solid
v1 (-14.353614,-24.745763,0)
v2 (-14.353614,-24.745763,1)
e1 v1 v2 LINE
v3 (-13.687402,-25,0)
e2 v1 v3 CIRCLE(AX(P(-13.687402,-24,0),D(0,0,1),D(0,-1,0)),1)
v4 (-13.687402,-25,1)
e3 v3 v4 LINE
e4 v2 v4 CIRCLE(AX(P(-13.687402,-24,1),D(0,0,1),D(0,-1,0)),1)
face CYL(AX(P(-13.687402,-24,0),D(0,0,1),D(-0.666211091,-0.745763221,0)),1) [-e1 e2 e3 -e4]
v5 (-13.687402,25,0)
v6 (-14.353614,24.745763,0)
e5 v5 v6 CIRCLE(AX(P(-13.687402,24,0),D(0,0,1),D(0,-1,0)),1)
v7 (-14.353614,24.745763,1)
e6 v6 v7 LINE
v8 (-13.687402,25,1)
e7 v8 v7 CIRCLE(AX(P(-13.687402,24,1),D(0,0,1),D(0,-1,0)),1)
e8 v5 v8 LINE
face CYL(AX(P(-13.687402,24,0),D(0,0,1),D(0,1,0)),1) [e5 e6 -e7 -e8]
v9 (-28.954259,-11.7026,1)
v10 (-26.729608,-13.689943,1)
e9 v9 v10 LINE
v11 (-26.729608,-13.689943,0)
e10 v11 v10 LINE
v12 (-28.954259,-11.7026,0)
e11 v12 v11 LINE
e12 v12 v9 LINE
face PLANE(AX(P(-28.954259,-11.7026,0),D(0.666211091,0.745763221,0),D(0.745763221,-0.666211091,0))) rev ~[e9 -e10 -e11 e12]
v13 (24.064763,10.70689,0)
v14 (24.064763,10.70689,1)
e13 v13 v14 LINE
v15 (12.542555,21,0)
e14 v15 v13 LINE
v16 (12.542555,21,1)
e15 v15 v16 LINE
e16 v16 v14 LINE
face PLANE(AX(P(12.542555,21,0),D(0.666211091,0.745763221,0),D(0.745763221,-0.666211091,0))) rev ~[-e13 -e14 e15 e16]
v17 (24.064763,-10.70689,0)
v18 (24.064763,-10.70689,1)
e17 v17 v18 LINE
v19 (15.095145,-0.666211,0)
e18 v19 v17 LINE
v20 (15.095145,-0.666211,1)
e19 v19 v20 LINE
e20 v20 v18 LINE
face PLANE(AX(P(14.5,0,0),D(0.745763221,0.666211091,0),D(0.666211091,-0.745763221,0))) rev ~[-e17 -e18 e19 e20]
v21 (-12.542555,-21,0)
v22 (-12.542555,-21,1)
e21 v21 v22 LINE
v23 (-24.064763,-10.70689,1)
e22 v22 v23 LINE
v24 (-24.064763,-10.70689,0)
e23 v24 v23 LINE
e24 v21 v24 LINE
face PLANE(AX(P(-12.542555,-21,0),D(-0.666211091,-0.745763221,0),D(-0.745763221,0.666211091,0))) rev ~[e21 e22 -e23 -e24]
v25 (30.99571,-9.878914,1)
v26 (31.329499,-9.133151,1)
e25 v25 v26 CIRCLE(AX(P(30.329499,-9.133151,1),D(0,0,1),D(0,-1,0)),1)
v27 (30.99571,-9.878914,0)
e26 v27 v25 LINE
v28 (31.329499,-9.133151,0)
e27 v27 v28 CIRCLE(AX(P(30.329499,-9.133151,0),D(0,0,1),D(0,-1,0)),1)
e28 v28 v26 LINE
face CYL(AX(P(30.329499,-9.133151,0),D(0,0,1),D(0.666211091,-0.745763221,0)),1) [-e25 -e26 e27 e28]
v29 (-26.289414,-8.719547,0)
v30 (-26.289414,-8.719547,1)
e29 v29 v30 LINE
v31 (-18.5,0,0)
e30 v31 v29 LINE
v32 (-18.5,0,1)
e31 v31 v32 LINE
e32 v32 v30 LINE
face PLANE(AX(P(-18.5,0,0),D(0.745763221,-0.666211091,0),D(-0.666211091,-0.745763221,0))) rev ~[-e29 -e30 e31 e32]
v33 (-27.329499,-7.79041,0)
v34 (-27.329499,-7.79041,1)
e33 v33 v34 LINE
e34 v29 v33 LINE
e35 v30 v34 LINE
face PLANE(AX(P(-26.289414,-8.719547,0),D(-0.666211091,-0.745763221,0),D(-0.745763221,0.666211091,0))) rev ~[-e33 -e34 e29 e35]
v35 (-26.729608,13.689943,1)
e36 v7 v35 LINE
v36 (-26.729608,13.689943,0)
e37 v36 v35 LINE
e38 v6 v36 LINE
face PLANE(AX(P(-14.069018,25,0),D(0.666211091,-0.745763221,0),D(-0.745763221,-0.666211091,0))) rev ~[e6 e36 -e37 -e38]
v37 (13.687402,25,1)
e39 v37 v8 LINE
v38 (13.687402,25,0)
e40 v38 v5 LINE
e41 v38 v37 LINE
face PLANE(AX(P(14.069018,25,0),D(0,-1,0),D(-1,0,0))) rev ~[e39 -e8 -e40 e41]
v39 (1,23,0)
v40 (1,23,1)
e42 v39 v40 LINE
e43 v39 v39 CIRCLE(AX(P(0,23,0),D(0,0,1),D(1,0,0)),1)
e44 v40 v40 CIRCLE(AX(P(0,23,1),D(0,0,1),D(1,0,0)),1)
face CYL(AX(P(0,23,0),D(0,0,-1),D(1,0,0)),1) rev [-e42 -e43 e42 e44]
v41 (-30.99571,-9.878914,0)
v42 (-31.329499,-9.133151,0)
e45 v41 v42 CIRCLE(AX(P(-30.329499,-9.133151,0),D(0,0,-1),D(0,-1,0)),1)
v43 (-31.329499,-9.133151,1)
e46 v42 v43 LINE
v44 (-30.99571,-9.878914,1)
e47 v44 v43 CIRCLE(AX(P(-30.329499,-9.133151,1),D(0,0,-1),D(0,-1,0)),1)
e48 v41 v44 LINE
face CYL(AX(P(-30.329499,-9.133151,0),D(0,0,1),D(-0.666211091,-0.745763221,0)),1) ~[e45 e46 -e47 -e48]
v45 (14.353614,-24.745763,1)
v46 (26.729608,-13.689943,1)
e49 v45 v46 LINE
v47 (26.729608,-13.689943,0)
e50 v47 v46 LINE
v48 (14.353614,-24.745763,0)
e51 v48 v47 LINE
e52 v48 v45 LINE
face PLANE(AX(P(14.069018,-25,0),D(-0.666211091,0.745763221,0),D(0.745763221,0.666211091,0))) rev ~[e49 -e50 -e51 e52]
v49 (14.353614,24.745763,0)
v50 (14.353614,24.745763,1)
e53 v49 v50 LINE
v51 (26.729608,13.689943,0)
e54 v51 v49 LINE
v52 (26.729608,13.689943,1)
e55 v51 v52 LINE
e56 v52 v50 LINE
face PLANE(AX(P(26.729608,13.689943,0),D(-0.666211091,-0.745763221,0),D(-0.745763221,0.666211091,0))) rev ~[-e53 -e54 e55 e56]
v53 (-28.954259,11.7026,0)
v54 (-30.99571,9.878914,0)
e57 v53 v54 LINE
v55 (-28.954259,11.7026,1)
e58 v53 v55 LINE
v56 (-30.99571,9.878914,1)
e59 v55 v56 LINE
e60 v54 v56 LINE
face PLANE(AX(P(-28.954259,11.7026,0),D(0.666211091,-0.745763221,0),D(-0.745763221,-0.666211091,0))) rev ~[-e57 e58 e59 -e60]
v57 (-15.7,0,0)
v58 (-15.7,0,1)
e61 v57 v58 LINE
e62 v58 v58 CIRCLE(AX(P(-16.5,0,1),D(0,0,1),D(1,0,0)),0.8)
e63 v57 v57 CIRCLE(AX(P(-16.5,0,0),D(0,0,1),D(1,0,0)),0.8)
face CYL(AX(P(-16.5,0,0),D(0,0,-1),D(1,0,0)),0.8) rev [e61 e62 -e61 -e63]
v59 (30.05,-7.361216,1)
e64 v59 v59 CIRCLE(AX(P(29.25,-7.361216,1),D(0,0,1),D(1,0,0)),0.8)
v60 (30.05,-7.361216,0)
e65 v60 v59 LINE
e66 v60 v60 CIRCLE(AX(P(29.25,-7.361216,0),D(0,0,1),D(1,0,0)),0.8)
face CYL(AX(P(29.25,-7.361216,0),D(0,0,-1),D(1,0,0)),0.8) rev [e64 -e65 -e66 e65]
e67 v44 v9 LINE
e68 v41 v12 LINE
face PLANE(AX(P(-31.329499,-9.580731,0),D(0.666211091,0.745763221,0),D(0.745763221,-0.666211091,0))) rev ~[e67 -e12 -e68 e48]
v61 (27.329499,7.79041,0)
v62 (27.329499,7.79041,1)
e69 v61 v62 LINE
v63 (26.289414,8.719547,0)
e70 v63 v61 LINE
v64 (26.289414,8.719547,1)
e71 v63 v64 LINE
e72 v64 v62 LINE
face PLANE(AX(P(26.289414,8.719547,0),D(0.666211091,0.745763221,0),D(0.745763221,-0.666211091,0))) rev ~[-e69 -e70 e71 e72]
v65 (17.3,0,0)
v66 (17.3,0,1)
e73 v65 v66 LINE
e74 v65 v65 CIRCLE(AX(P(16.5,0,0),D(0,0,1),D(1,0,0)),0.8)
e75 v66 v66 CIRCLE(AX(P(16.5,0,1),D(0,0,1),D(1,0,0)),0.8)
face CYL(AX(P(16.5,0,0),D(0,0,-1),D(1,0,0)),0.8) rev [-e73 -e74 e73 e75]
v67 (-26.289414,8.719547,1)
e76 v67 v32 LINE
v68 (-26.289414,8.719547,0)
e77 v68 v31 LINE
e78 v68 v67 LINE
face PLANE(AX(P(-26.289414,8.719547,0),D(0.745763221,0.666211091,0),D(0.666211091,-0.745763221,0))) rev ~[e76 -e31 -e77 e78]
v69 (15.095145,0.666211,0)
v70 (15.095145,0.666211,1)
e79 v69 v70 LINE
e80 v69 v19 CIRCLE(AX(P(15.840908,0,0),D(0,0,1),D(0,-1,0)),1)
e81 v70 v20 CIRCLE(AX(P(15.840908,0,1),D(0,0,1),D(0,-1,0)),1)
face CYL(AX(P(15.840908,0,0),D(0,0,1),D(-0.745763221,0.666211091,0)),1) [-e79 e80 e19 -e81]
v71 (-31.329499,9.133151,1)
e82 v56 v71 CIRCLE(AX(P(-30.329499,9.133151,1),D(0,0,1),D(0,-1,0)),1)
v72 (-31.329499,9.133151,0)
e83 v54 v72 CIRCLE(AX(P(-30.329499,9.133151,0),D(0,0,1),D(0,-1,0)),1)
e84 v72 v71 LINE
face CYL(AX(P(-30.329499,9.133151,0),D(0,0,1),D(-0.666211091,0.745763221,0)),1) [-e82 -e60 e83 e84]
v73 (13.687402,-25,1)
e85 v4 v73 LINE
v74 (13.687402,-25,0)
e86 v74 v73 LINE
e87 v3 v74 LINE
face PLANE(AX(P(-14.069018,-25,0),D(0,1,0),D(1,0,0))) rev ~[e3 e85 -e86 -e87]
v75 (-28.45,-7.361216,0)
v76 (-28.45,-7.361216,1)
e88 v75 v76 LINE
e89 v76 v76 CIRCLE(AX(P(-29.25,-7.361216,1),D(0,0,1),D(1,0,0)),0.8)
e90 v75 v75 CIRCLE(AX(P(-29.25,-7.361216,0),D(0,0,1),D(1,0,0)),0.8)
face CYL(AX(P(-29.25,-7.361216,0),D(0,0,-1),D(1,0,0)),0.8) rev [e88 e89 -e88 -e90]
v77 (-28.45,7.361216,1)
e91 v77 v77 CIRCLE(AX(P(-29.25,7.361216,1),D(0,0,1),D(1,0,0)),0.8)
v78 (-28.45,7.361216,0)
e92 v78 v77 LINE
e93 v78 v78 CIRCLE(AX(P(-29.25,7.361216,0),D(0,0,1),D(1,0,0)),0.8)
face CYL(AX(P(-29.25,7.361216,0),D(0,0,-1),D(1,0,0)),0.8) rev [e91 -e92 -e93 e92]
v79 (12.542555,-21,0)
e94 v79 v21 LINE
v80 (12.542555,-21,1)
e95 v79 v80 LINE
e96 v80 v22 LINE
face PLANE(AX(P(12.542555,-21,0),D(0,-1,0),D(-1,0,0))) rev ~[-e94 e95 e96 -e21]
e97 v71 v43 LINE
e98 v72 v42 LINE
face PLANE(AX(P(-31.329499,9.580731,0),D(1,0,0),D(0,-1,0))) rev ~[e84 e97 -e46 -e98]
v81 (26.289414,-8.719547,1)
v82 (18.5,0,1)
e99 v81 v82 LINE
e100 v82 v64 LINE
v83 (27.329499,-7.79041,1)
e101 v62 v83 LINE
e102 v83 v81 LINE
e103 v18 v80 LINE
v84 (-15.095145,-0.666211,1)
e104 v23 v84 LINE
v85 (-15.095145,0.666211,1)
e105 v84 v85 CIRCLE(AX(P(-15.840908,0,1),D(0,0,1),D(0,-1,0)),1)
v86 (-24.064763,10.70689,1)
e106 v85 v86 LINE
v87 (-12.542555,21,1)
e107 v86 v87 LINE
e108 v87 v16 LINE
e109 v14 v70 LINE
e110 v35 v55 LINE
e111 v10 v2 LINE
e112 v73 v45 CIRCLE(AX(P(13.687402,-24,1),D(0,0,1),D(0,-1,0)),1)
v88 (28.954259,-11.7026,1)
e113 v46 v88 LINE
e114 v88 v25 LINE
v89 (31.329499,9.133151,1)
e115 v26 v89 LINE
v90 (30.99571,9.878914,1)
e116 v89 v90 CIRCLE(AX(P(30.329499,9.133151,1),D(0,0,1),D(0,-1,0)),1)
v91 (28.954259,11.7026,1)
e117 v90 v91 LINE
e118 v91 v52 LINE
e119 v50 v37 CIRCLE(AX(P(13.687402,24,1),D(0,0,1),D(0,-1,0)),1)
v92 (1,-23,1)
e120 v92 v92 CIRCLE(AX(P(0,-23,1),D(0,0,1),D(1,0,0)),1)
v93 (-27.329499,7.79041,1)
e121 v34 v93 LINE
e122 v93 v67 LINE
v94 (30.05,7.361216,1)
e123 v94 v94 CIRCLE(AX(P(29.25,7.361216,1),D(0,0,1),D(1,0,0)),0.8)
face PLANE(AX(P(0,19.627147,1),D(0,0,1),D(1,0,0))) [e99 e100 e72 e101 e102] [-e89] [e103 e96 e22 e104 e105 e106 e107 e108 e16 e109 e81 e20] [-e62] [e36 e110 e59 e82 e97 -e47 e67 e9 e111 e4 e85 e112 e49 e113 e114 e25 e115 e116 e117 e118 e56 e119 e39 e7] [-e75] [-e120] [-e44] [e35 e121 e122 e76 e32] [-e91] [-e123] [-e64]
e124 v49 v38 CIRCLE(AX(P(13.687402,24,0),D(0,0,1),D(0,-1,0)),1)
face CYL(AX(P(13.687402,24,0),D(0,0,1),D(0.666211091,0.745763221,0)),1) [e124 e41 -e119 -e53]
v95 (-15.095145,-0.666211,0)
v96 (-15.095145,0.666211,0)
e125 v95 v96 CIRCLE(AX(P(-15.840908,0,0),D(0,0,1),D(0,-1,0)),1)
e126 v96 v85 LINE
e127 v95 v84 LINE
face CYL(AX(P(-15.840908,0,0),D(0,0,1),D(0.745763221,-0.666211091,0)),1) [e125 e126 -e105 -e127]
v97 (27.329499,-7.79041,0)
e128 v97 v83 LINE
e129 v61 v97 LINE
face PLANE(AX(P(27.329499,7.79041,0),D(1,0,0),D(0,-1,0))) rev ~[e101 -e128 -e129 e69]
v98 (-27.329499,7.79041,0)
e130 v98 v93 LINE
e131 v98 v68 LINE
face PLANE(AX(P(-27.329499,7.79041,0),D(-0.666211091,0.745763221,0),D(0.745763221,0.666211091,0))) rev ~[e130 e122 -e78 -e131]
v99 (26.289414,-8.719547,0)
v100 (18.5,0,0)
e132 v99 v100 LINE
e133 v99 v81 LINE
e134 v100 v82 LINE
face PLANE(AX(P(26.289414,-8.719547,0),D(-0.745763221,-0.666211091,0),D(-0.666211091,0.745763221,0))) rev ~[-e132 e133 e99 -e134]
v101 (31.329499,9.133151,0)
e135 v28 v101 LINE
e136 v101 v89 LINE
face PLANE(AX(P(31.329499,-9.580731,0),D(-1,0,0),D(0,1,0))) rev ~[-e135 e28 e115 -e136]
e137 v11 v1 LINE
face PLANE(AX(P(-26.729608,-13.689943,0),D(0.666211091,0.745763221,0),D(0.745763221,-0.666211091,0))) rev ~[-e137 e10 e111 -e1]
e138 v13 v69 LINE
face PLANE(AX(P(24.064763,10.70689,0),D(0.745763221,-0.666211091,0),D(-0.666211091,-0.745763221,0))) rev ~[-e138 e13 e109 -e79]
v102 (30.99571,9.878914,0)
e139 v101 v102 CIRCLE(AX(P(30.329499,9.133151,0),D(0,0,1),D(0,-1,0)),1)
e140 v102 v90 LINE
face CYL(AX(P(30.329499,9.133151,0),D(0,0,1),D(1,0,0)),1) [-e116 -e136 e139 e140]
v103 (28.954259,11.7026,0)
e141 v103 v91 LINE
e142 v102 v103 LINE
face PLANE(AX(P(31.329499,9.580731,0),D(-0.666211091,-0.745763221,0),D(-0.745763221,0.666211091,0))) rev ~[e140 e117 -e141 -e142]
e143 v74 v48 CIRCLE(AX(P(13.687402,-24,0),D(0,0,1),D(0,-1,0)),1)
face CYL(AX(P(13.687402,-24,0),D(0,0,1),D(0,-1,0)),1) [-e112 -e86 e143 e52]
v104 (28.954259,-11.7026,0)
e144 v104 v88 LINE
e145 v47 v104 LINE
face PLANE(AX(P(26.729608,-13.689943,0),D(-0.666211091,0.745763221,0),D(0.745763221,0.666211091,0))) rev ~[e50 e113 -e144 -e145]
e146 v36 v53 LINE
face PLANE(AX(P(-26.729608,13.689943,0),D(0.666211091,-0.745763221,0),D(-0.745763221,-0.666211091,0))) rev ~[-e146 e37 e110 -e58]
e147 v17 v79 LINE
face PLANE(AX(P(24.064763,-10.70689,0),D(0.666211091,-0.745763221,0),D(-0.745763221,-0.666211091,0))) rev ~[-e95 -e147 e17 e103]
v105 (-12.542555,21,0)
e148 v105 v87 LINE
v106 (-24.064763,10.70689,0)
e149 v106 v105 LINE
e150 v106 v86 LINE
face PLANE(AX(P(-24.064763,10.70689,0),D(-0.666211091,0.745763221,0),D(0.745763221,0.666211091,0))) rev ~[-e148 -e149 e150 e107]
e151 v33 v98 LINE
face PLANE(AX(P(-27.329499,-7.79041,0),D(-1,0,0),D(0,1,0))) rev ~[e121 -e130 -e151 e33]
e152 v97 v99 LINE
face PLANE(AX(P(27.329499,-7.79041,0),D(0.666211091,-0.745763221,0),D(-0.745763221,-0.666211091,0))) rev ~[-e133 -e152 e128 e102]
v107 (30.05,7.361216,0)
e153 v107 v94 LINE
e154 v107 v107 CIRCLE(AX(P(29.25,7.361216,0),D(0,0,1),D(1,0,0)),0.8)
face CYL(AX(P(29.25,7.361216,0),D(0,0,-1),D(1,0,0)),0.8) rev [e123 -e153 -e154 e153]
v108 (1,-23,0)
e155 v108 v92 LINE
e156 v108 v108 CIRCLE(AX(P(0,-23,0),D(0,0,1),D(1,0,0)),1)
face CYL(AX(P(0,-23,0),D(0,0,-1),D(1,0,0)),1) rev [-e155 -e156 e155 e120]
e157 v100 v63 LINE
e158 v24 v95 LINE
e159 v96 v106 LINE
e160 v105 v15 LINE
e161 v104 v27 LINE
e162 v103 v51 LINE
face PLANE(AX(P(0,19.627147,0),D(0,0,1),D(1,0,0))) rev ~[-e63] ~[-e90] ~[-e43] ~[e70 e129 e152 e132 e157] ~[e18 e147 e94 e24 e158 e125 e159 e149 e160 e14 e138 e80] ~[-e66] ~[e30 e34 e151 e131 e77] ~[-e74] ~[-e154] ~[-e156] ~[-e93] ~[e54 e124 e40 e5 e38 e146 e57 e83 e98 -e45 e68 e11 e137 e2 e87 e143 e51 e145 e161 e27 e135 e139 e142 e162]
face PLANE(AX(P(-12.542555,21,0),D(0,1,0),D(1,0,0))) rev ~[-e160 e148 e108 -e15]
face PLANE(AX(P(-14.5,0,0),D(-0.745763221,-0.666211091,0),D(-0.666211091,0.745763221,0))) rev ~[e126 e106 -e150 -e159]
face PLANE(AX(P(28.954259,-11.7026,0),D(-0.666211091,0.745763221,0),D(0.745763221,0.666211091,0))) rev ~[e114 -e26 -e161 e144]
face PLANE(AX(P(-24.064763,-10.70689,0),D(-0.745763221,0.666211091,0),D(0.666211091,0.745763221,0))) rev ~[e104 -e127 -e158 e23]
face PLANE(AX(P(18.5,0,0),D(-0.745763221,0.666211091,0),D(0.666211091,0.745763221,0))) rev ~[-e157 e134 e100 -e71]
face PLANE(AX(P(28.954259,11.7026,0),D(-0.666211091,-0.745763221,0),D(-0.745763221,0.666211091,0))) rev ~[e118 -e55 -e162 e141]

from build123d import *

# Parameters (mm, degrees)
F0_R     = 1
F0_R_2   = 0.8
F1_DEPTH = 1
F2_R     = 1


with BuildPart() as f1:
    # F0 (on Top) → F1 (new body)
    with BuildSketch(Plane.XY):
        Polygon((14.0690184001, 25), (0, 25), (-14.0690184001, 25), (-26.7296075576, 13.6899425008), (-24.0647631939, 10.7068896154), (-12.5425545984, 21), (0, 21), (12.5425545984, 21), (24.0647631939, 10.7068896154), (26.7296075576, 13.6899425008), align=None)
        with Locations((0, 23)):
            Circle(F0_R, mode=Mode.SUBTRACT)
        Polygon((28.9542586869, 11.7025995837), (26.7296075576, 13.6899425008), (24.0647631939, 10.7068896154), (26.2894143232, 8.7195466983), align=None)
        Polygon((-24.0647631939, 10.7068896154), (-26.7296075576, 13.6899425008), (-28.9542586869, 11.7025995837), (-26.2894143232, 8.7195466983), align=None)
        Polygon((31.3294992745, 9.5807309025), (28.9542586869, 11.7025995837), (26.2894143232, 8.7195466983), (27.3294992745, 7.7904097951), (27.3294992745, 0.0814010352), (27.3294992745, -0.0814010352), (27.3294992745, -7.7904097951), (26.2894143232, -8.7195466983), (28.9542586869, -11.7025995837), (31.3294992745, -9.5807309025), (31.3294992745, 0), align=None)
        with Locations((29.25, -7.3612159322)):
            Circle(F0_R_2, mode=Mode.SUBTRACT)
        with Locations((29.25, 7.3612159322)):
            Circle(F0_R_2, mode=Mode.SUBTRACT)
        Polygon((26.2894143232, 8.7195466983), (24.0647631939, 10.7068896154), (14.5, 0), (24.0647631939, -10.7068896154), (26.2894143232, -8.7195466983), (18.5, 0), align=None)
        with Locations((16.5, 0)):
            Circle(F0_R_2, mode=Mode.SUBTRACT)
        Polygon((-26.2894143232, 8.7195466983), (-28.9542586869, 11.7025995837), (-31.3294992745, 9.5807309025), (-31.3294992745, 0), (-31.3294992745, -9.5807309025), (-28.9542586869, -11.7025995837), (-26.2894143232, -8.7195466983), (-27.3294992745, -7.7904097951), (-27.3294992745, -0.0814010352), (-27.3294992745, 0.0814010352), (-27.3294992745, 7.7904097951), align=None)
        with Locations((-29.25, -7.3612159322)):
            Circle(F0_R_2, mode=Mode.SUBTRACT)
        with Locations((-29.25, 7.3612159322)):
            Circle(F0_R_2, mode=Mode.SUBTRACT)
        Polygon((-14.5, 0), (-24.0647631939, 10.7068896154), (-26.2894143232, 8.7195466983), (-18.5, 0), (-26.2894143232, -8.7195466983), (-24.0647631939, -10.7068896154), align=None)
        with Locations((-16.5, 0)):
            Circle(F0_R_2, mode=Mode.SUBTRACT)
        Polygon((26.2894143232, -8.7195466983), (24.0647631939, -10.7068896154), (26.7296075576, -13.6899425008), (28.9542586869, -11.7025995837), align=None)
        Polygon((26.7296075576, -13.6899425008), (24.0647631939, -10.7068896154), (12.5425545984, -21), (0, -21), (-12.5425545984, -21), (-24.0647631939, -10.7068896154), (-26.7296075576, -13.6899425008), (-14.0690184001, -25), (0, -25), (14.0690184001, -25), align=None)
        with Locations((0, -23)):
            Circle(F0_R, mode=Mode.SUBTRACT)
        Polygon((-26.7296075576, -13.6899425008), (-24.0647631939, -10.7068896154), (-26.2894143232, -8.7195466983), (-28.9542586869, -11.7025995837), align=None)
    extrude(amount=F1_DEPTH)

    # F2
    f2_edges = [f1.edges().sort_by_distance(p)[0] for p in [
        (-14.069018, 25, 0.5),
        (-31.329499, 9.580731, 0.5),
        (-31.329499, -9.580731, 0.5),
        (-14.069018, -25, 0.5),
        (14.069018, -25, 0.5),
        (31.329499, -9.580731, 0.5),
        (31.329499, 9.580731, 0.5),
        (14.069018, 25, 0.5),
        (14.5, 0, 0.5),
        (-14.5, 0, 0.5),
    ]]
    fillet(f2_edges, radius=F2_R)


solid = f1.part
